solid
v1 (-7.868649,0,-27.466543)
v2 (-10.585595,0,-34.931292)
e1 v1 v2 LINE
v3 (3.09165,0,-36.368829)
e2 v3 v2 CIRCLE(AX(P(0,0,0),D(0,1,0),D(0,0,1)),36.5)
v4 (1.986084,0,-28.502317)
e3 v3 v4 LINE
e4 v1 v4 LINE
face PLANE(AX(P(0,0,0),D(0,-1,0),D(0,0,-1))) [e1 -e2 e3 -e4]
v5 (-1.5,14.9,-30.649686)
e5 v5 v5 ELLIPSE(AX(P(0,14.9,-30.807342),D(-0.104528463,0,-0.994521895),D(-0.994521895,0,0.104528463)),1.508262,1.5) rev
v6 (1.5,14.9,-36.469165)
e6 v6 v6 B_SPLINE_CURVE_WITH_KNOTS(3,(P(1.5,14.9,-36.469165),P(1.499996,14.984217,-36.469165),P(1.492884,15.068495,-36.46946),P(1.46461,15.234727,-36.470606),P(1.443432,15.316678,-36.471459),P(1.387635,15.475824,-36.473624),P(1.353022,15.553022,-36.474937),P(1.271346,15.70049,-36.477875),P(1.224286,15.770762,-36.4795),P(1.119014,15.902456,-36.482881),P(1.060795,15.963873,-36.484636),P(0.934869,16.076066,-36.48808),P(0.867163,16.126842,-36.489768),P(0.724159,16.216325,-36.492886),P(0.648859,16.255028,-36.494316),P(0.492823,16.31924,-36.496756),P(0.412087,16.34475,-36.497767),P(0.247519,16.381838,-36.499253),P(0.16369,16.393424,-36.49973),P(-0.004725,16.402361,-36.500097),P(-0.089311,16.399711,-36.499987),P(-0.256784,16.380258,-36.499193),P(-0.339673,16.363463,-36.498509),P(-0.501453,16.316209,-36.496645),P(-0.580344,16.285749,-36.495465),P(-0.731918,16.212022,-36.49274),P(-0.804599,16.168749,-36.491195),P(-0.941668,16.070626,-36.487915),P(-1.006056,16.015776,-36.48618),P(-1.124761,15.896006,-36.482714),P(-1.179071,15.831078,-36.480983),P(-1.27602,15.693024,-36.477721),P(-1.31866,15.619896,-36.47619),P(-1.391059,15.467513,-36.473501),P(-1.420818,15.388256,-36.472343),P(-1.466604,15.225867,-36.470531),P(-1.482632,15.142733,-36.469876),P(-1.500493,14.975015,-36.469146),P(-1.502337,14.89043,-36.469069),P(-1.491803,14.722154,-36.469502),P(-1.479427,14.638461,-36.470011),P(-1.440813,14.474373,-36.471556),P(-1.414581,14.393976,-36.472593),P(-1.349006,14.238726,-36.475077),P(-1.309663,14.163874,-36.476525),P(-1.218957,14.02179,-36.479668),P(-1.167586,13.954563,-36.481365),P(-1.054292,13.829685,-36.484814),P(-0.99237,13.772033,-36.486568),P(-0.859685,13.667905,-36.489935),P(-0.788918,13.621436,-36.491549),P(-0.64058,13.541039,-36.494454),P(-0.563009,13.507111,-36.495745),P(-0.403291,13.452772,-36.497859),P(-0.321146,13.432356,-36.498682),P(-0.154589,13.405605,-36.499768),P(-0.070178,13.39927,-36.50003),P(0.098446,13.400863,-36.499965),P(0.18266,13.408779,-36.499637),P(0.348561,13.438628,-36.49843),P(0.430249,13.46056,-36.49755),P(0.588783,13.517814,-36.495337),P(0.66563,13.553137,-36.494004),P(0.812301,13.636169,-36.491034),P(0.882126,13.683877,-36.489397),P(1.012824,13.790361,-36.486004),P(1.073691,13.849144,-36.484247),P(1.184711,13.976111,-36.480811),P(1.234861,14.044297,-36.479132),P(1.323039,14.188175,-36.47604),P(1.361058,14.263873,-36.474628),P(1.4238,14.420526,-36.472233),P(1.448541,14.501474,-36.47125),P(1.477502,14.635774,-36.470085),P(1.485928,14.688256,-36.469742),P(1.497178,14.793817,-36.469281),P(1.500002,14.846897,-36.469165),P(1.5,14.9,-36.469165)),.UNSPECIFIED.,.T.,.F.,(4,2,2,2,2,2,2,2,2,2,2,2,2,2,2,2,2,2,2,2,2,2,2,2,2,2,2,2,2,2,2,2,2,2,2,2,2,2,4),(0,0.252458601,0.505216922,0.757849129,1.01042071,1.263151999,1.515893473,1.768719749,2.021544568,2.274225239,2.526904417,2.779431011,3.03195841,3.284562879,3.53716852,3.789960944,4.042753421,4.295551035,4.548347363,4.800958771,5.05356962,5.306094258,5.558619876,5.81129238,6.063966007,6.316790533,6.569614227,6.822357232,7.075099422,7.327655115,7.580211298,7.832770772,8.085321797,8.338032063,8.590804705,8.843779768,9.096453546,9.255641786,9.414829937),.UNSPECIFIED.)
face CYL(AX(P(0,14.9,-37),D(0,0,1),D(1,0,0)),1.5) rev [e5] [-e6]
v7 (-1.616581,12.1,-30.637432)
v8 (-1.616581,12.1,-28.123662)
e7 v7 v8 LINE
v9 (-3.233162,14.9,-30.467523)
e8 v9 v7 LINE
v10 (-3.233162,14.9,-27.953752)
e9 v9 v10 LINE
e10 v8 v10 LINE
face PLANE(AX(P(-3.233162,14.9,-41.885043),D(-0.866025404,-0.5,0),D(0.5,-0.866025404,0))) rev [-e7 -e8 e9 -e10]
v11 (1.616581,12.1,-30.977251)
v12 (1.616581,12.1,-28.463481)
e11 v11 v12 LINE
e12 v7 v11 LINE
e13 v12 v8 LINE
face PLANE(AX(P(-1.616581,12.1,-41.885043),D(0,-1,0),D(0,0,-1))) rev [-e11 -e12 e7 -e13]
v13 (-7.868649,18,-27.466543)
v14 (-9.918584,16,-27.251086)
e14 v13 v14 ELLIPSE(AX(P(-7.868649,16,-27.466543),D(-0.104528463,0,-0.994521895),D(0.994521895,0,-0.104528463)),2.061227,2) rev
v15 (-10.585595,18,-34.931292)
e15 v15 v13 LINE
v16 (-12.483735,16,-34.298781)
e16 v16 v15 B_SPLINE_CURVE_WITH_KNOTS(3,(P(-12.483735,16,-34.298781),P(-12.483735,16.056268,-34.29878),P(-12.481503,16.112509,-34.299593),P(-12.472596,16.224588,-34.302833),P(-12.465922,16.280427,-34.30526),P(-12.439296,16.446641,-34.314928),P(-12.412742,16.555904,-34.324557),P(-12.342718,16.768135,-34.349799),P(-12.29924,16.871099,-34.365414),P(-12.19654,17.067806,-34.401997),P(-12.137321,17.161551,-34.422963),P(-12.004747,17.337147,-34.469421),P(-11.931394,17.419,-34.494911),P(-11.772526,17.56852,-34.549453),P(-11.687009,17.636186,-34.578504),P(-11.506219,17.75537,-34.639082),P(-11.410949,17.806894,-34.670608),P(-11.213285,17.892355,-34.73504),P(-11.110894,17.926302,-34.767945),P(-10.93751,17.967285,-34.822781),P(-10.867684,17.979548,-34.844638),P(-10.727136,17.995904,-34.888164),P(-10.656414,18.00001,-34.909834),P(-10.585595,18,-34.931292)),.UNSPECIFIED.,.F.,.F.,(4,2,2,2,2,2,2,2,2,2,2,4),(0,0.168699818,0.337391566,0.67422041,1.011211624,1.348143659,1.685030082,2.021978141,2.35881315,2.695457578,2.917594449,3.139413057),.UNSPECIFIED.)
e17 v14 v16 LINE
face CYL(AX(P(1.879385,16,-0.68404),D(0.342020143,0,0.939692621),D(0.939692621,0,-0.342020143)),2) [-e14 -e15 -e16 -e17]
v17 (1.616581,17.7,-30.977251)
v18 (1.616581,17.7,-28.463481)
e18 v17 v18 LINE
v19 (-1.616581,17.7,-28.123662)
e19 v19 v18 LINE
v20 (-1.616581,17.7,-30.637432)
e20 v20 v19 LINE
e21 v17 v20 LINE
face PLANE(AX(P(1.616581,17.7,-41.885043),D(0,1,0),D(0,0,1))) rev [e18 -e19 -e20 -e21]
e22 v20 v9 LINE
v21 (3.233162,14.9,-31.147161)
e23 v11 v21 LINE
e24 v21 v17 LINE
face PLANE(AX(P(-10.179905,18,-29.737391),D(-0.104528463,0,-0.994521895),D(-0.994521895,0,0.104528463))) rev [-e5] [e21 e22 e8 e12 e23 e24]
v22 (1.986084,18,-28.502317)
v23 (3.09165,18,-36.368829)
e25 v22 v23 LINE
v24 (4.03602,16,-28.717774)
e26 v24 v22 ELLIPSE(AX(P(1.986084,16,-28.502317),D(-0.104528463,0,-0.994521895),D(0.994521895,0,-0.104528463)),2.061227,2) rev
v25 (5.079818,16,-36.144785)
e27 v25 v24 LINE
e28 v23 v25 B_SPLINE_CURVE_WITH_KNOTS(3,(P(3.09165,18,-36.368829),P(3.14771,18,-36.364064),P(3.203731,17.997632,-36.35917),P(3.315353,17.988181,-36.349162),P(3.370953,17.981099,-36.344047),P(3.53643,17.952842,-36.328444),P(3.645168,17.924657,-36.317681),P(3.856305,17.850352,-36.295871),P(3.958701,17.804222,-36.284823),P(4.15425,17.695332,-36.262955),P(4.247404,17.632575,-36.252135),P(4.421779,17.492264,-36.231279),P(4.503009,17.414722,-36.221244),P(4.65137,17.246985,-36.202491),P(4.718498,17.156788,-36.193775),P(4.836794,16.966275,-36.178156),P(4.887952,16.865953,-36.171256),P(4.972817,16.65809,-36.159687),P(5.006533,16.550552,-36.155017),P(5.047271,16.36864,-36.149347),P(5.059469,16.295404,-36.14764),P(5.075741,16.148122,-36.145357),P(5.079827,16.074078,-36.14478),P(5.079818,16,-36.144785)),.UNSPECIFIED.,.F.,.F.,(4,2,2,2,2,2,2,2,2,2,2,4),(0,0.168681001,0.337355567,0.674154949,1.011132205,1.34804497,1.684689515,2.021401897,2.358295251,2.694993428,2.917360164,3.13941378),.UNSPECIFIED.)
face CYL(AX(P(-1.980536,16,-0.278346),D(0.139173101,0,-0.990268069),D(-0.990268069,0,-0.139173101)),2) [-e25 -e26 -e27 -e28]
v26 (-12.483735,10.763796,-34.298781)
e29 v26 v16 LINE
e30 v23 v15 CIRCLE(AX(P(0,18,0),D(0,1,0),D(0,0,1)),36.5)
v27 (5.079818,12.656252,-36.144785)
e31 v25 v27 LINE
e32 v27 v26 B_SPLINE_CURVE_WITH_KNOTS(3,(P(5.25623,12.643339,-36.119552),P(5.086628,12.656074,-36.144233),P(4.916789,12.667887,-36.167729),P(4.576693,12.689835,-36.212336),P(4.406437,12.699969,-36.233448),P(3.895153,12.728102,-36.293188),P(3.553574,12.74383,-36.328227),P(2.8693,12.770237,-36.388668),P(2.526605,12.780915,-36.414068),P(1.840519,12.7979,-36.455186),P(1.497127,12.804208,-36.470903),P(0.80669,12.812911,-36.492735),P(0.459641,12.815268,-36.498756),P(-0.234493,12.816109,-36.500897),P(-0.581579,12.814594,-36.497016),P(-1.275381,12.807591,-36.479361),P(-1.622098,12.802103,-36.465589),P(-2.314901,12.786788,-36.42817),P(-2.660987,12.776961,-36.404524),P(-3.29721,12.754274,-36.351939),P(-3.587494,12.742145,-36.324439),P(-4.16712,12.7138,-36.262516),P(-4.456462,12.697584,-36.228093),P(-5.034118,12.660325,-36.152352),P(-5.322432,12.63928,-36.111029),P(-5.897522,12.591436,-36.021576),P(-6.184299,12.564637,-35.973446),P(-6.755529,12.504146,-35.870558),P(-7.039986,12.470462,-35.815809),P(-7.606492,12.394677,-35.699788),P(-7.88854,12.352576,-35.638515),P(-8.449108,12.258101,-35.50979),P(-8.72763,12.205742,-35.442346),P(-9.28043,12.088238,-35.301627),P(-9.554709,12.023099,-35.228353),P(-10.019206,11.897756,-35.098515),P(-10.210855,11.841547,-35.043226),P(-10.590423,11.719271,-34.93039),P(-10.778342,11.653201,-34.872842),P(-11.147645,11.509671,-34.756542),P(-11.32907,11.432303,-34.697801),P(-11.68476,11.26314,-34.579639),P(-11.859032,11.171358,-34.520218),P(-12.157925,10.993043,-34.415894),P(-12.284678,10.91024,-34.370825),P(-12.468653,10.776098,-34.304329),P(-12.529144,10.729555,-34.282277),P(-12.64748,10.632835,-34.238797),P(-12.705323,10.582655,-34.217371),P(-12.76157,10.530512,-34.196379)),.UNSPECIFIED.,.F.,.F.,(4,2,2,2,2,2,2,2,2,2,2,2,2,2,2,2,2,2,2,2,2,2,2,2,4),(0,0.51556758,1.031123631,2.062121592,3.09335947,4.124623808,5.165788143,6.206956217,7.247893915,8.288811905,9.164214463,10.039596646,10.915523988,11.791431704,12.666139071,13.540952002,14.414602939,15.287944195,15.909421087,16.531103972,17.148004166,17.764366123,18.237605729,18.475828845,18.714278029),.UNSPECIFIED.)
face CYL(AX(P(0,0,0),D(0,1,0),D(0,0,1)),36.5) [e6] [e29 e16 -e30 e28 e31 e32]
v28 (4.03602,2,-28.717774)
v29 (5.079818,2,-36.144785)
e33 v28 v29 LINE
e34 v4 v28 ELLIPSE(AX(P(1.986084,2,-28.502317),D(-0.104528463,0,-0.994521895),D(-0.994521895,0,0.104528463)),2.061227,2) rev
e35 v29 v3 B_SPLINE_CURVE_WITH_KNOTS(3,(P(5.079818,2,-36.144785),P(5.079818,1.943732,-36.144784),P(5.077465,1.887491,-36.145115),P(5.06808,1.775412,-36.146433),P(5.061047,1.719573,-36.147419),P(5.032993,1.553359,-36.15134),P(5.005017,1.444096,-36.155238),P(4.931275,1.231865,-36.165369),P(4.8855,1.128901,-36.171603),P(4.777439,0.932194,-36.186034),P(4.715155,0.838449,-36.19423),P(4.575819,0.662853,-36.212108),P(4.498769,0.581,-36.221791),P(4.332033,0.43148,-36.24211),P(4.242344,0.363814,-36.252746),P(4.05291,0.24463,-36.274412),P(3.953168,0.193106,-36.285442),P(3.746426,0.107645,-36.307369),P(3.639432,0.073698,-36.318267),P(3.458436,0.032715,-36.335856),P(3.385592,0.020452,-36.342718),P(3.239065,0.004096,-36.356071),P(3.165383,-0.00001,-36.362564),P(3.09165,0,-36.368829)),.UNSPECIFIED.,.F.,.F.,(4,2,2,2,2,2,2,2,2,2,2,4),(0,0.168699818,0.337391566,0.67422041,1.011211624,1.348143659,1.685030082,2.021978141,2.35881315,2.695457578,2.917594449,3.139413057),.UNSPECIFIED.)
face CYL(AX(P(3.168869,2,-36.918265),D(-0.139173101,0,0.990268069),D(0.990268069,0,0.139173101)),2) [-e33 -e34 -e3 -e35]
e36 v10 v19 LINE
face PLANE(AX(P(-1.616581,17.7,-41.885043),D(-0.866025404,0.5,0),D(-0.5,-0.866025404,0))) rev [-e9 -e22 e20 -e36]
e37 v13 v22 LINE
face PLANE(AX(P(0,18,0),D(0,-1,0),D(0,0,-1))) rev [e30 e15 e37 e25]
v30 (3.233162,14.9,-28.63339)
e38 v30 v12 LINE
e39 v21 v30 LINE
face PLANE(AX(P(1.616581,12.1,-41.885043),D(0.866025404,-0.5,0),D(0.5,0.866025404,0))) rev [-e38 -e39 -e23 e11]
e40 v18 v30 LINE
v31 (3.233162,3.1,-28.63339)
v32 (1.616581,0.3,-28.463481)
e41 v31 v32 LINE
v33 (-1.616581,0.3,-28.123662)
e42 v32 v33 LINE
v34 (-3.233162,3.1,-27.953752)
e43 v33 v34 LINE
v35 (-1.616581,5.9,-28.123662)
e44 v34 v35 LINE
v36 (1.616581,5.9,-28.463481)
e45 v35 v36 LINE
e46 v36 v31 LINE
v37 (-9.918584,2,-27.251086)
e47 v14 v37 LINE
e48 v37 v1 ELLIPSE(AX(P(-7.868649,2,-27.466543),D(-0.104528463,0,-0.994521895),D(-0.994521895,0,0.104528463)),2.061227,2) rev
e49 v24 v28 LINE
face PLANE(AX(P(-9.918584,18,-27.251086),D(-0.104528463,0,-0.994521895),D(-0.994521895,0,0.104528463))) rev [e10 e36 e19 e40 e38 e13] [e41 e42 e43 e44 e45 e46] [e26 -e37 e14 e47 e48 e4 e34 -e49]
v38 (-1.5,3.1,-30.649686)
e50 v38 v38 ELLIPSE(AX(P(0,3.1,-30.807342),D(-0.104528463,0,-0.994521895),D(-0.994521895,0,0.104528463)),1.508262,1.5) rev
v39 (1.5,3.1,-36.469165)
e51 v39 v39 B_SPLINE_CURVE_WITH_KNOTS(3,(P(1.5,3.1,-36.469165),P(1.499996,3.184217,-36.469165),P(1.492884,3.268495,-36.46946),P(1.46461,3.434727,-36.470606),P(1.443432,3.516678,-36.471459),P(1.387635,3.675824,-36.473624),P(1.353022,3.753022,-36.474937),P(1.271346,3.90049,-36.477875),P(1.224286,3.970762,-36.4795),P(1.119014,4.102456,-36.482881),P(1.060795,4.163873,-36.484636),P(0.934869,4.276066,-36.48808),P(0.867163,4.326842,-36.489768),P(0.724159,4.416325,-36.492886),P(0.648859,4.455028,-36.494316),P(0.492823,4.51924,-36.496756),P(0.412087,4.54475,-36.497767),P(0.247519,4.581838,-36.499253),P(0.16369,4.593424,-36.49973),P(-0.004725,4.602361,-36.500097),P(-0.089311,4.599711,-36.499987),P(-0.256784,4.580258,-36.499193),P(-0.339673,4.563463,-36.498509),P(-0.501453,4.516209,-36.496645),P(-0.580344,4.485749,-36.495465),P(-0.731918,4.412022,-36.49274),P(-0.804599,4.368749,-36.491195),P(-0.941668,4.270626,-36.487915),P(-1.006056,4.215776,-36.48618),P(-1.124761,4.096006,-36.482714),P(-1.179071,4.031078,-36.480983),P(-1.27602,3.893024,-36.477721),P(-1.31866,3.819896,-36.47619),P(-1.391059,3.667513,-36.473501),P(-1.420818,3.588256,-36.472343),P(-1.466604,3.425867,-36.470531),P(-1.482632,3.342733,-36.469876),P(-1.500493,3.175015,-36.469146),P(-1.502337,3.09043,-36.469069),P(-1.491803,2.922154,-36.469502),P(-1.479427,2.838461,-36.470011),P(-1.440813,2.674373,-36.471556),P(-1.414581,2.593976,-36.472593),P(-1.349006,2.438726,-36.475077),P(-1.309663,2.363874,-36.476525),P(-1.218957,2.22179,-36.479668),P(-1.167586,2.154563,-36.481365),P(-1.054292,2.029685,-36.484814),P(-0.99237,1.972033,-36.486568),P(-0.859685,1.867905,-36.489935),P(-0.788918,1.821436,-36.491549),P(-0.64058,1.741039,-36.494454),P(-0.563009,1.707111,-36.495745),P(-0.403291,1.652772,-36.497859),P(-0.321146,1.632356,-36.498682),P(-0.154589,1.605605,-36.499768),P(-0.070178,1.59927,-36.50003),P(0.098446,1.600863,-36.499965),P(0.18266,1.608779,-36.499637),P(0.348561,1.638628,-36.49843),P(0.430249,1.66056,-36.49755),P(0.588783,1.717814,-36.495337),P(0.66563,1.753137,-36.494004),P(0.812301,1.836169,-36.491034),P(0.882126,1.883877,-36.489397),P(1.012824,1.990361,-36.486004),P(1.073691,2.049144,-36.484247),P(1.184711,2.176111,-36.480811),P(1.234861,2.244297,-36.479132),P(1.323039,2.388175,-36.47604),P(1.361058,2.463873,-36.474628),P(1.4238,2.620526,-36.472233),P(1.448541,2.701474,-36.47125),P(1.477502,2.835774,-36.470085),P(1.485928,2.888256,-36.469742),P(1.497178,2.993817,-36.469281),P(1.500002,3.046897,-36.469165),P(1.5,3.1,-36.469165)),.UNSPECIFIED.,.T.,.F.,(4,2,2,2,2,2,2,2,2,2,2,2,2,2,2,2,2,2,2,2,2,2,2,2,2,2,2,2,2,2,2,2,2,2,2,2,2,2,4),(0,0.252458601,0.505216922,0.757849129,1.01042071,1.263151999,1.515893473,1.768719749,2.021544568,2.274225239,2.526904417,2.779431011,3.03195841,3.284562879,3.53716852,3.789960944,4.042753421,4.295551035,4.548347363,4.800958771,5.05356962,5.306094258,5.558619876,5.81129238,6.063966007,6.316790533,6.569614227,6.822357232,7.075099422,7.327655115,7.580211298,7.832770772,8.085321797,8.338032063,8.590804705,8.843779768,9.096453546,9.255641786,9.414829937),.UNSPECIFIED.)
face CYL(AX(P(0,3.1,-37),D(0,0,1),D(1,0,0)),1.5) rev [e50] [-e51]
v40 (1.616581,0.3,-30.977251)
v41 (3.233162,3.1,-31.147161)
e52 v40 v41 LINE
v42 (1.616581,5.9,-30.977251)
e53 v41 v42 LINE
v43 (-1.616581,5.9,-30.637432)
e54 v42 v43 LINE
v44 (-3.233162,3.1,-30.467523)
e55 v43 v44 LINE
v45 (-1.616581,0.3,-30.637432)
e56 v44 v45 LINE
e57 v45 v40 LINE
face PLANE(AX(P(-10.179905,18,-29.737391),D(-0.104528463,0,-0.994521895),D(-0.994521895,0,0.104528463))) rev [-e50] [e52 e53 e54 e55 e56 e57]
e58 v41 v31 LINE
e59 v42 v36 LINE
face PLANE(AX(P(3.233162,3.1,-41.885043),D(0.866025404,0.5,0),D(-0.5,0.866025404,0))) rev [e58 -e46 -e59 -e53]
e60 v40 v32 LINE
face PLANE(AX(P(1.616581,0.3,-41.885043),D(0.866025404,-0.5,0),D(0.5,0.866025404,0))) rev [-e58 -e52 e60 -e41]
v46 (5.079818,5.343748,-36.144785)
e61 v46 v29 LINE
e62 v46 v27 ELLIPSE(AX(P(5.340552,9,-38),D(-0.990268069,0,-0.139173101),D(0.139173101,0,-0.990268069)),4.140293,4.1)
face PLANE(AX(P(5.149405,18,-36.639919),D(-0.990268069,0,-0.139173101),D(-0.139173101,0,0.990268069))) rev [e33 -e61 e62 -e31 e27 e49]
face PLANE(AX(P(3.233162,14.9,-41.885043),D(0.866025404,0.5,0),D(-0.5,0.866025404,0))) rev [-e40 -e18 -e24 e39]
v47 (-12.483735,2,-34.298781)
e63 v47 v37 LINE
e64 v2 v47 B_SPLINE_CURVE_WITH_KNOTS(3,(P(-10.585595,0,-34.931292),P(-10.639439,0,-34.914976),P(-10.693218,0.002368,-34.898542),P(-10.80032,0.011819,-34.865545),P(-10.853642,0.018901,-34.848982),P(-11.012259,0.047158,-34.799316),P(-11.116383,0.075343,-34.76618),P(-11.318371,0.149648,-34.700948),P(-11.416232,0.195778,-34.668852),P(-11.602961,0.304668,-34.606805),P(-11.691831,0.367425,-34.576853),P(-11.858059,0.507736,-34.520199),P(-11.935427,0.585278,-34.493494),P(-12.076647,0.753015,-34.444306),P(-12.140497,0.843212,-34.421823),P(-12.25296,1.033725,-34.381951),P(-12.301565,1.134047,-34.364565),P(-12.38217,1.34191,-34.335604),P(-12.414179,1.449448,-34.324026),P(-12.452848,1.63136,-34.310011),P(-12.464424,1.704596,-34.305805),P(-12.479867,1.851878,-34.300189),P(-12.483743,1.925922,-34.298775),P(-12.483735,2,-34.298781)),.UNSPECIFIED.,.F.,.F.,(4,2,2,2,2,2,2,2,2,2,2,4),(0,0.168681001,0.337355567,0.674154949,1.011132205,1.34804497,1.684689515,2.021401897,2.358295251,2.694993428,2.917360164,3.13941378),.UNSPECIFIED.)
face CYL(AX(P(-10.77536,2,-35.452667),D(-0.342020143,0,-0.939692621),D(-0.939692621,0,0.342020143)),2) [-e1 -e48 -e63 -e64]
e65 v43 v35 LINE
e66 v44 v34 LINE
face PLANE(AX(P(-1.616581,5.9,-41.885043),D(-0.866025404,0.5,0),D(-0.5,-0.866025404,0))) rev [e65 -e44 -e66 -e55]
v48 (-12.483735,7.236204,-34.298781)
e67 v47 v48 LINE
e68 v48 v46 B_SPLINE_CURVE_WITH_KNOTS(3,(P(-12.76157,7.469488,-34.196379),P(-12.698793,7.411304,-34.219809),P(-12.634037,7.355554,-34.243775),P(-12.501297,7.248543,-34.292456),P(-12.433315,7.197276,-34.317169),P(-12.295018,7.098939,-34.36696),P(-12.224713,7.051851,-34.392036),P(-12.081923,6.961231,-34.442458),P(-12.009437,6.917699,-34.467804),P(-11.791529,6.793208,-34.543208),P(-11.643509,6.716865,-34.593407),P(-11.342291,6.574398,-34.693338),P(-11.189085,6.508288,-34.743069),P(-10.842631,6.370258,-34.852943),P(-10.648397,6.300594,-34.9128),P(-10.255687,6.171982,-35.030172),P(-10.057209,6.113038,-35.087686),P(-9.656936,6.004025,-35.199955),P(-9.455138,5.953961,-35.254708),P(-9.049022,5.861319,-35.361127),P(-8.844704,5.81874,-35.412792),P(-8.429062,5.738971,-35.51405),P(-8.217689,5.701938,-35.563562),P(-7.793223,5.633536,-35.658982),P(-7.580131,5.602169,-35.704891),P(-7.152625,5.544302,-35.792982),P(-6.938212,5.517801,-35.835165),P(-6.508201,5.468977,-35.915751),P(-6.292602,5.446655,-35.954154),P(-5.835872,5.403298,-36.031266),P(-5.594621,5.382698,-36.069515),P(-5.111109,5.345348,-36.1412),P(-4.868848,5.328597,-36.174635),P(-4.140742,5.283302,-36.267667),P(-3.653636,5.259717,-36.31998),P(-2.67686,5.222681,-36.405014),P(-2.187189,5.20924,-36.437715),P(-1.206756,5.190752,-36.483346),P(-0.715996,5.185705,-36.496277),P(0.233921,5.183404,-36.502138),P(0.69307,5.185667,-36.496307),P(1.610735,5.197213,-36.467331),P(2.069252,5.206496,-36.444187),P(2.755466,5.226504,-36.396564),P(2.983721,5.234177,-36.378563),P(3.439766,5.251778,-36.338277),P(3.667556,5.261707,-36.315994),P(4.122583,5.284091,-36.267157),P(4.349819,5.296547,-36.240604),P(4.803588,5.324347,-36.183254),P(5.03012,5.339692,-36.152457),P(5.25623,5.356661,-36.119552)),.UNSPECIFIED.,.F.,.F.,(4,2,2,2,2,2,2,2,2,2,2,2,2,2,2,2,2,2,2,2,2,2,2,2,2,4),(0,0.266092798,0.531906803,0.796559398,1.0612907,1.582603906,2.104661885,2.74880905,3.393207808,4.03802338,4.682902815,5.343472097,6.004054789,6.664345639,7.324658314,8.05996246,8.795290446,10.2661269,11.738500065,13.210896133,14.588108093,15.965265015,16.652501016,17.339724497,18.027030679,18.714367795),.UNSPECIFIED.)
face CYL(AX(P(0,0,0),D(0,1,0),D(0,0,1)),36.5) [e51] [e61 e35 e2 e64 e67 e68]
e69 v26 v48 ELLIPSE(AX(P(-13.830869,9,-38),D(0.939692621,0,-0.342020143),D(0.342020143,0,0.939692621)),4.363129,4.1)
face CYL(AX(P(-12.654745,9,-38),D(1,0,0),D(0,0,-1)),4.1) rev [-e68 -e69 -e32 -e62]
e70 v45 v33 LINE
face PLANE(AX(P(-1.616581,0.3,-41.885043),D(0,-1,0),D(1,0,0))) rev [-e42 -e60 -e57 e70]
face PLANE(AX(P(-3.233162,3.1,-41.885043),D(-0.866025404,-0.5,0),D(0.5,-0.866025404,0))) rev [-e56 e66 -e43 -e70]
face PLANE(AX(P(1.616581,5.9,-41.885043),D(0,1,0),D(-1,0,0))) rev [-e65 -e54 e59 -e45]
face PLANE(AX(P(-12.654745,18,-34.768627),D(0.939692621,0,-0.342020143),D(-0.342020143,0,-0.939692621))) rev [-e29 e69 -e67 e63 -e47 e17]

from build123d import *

# Parameters (mm, degrees)
BOSS_EXTRUDE1_DEPTH     = 18
CUT_EXTRUDE1_DEPTH      = 44.04814257
CUT_EXTRUDE1_DEPTH_BACK = 44.04814257
SKETCH5_R               = 1.5
CUT_EXTRUDE2_DEPTH      = 44.048142727
CUT_EXTRUDE3_START      = -18
CUT_EXTRUDE3_DEPTH      = 18
FILLET1_R               = 2
CUT_EXTRUDE5_REACH      = 44.569


# Read off the part's stored shape, not the designer's step: Cut-Extrude3
with BuildPart() as part:
    # Sketch2 → Boss-Extrude1 (new body)
    with BuildSketch(Plane(origin=(0, 0, 0), x_dir=(1, 0, 0), z_dir=(0, 1, 0))):
        with BuildLine():
            Line((5.149404736, 36.639918543), (4.036019928, 28.717773994))
            Line((4.036019928, 28.717773994), (-9.918584156, 27.251086003))
            Line((-9.918584156, 27.251086003), (-12.654745303, 34.768626969))
            ThreePointArc((-12.654745303, 34.768626969), (-3.867553141, 36.797310129), (5.149404736, 36.639918543))
        make_face()
    extrude(amount=BOSS_EXTRUDE1_DEPTH)

    # Sketch3 → Cut-Extrude1 (cut, two sides: drawn at the far end of the back side and taken through both)
    with BuildSketch(Plane(origin=(0, 0, 0), x_dir=(0, 0, -1), z_dir=(1, 0, 0)).offset(-CUT_EXTRUDE1_DEPTH_BACK)):
        with BuildLine():
            Line((38, 13.1), (41.639918543, 13.1))
            Line((41.639918543, 13.1), (41.639918543, 4.9))
            Line((41.639918543, 4.9), (38, 4.9))
            ThreePointArc((38, 4.9), (33.9, 9), (38, 13.1))
        make_face()
    extrude(amount=CUT_EXTRUDE1_DEPTH + CUT_EXTRUDE1_DEPTH_BACK, mode=Mode.SUBTRACT)

    # Sketch5 → Cut-Extrude2 (cut, through all)
    with BuildSketch(Plane.XY):
        with Locations(Location((0, 3.1, 0), (0, 0, 90))):
            Circle(SKETCH5_R)
        with Locations(Location((0, 14.9, 0), (0, 0, 90))):
            Circle(SKETCH5_R)
    extrude(amount=-CUT_EXTRUDE2_DEPTH, mode=Mode.SUBTRACT)

    # Cut-Extrude3 outline → Cut-Extrude3 (cut)
    with BuildSketch(Plane(origin=(0, 18, 0), x_dir=(1, 0, 0), z_dir=(0, 1, 0)).offset(CUT_EXTRUDE3_START)):
        with BuildLine():
            ThreePointArc((-12.483737701, 34.29877976), (-3.815290216, 36.300049044), (5.079818185, 36.144784509))
            Line((5.079818185, 36.144784509), (5.149404736, 36.639918543))
            ThreePointArc((5.149404736, 36.639918543), (-3.867553141, 36.797310129), (-12.654745303, 34.768626969))
            Line((-12.654745303, 34.768626969), (-12.483737701, 34.29877976))
        make_face()
    extrude(amount=CUT_EXTRUDE3_DEPTH, mode=Mode.SUBTRACT)

    # Fillet1
    fillet1_edges = [part.edges().sort_by_distance(p)[0] for p in [
        (4.557919056, 18, -32.431279251),
        (4.557919056, 0, -32.431279251),
        (-11.201159694, 0, -30.774933331),
        (-11.201159694, 18, -30.774933331),
    ]]
    fillet(fillet1_edges, radius=FILLET1_R)

    # Cut-Extrude5: up to this plane
    cut_extrude5_end = Plane(origin=(-10.179905315, 18, -29.737390741), z_dir=(-0.10452846326765396, 0, -0.9945218953682733))
    # Sketch7 → Cut-Extrude5 (cut, up to the surface)
    with BuildSketch(Plane.XY, mode=Mode.PRIVATE) as cut_extrude5_sk1:
        Polygon((3.233161507, 14.9), (1.616580754, 17.7), (-1.616580754, 17.7), (-3.233161507, 14.9), (-1.616580754, 12.1), (1.616580754, 12.1), align=None)
    cut_extrude5_tool1 = split(extrude(cut_extrude5_sk1.sketch, amount=-CUT_EXTRUDE5_REACH, mode=Mode.PRIVATE), bisect_by=cut_extrude5_end, keep=Keep.BOTH, mode=Mode.PRIVATE)
    add(cut_extrude5_tool1.solids().sort_by_distance((0, 14.9, 0))[0], mode=Mode.SUBTRACT)
    # Sketch7 → Cut-Extrude5 (cut, up to the surface)
    with BuildSketch(Plane.XY, mode=Mode.PRIVATE) as cut_extrude5_sk2:
        Polygon((-3.233161507, 3.1), (-1.616580754, 0.3), (1.616580754, 0.3), (3.233161507, 3.1), (1.616580754, 5.9), (-1.616580754, 5.9), align=None)
    cut_extrude5_tool2 = split(extrude(cut_extrude5_sk2.sketch, amount=-CUT_EXTRUDE5_REACH, mode=Mode.PRIVATE), bisect_by=cut_extrude5_end, keep=Keep.BOTH, mode=Mode.PRIVATE)
    add(cut_extrude5_tool2.solids().sort_by_distance((0, 3.1, 0))[0], mode=Mode.SUBTRACT)


solid = part.part
